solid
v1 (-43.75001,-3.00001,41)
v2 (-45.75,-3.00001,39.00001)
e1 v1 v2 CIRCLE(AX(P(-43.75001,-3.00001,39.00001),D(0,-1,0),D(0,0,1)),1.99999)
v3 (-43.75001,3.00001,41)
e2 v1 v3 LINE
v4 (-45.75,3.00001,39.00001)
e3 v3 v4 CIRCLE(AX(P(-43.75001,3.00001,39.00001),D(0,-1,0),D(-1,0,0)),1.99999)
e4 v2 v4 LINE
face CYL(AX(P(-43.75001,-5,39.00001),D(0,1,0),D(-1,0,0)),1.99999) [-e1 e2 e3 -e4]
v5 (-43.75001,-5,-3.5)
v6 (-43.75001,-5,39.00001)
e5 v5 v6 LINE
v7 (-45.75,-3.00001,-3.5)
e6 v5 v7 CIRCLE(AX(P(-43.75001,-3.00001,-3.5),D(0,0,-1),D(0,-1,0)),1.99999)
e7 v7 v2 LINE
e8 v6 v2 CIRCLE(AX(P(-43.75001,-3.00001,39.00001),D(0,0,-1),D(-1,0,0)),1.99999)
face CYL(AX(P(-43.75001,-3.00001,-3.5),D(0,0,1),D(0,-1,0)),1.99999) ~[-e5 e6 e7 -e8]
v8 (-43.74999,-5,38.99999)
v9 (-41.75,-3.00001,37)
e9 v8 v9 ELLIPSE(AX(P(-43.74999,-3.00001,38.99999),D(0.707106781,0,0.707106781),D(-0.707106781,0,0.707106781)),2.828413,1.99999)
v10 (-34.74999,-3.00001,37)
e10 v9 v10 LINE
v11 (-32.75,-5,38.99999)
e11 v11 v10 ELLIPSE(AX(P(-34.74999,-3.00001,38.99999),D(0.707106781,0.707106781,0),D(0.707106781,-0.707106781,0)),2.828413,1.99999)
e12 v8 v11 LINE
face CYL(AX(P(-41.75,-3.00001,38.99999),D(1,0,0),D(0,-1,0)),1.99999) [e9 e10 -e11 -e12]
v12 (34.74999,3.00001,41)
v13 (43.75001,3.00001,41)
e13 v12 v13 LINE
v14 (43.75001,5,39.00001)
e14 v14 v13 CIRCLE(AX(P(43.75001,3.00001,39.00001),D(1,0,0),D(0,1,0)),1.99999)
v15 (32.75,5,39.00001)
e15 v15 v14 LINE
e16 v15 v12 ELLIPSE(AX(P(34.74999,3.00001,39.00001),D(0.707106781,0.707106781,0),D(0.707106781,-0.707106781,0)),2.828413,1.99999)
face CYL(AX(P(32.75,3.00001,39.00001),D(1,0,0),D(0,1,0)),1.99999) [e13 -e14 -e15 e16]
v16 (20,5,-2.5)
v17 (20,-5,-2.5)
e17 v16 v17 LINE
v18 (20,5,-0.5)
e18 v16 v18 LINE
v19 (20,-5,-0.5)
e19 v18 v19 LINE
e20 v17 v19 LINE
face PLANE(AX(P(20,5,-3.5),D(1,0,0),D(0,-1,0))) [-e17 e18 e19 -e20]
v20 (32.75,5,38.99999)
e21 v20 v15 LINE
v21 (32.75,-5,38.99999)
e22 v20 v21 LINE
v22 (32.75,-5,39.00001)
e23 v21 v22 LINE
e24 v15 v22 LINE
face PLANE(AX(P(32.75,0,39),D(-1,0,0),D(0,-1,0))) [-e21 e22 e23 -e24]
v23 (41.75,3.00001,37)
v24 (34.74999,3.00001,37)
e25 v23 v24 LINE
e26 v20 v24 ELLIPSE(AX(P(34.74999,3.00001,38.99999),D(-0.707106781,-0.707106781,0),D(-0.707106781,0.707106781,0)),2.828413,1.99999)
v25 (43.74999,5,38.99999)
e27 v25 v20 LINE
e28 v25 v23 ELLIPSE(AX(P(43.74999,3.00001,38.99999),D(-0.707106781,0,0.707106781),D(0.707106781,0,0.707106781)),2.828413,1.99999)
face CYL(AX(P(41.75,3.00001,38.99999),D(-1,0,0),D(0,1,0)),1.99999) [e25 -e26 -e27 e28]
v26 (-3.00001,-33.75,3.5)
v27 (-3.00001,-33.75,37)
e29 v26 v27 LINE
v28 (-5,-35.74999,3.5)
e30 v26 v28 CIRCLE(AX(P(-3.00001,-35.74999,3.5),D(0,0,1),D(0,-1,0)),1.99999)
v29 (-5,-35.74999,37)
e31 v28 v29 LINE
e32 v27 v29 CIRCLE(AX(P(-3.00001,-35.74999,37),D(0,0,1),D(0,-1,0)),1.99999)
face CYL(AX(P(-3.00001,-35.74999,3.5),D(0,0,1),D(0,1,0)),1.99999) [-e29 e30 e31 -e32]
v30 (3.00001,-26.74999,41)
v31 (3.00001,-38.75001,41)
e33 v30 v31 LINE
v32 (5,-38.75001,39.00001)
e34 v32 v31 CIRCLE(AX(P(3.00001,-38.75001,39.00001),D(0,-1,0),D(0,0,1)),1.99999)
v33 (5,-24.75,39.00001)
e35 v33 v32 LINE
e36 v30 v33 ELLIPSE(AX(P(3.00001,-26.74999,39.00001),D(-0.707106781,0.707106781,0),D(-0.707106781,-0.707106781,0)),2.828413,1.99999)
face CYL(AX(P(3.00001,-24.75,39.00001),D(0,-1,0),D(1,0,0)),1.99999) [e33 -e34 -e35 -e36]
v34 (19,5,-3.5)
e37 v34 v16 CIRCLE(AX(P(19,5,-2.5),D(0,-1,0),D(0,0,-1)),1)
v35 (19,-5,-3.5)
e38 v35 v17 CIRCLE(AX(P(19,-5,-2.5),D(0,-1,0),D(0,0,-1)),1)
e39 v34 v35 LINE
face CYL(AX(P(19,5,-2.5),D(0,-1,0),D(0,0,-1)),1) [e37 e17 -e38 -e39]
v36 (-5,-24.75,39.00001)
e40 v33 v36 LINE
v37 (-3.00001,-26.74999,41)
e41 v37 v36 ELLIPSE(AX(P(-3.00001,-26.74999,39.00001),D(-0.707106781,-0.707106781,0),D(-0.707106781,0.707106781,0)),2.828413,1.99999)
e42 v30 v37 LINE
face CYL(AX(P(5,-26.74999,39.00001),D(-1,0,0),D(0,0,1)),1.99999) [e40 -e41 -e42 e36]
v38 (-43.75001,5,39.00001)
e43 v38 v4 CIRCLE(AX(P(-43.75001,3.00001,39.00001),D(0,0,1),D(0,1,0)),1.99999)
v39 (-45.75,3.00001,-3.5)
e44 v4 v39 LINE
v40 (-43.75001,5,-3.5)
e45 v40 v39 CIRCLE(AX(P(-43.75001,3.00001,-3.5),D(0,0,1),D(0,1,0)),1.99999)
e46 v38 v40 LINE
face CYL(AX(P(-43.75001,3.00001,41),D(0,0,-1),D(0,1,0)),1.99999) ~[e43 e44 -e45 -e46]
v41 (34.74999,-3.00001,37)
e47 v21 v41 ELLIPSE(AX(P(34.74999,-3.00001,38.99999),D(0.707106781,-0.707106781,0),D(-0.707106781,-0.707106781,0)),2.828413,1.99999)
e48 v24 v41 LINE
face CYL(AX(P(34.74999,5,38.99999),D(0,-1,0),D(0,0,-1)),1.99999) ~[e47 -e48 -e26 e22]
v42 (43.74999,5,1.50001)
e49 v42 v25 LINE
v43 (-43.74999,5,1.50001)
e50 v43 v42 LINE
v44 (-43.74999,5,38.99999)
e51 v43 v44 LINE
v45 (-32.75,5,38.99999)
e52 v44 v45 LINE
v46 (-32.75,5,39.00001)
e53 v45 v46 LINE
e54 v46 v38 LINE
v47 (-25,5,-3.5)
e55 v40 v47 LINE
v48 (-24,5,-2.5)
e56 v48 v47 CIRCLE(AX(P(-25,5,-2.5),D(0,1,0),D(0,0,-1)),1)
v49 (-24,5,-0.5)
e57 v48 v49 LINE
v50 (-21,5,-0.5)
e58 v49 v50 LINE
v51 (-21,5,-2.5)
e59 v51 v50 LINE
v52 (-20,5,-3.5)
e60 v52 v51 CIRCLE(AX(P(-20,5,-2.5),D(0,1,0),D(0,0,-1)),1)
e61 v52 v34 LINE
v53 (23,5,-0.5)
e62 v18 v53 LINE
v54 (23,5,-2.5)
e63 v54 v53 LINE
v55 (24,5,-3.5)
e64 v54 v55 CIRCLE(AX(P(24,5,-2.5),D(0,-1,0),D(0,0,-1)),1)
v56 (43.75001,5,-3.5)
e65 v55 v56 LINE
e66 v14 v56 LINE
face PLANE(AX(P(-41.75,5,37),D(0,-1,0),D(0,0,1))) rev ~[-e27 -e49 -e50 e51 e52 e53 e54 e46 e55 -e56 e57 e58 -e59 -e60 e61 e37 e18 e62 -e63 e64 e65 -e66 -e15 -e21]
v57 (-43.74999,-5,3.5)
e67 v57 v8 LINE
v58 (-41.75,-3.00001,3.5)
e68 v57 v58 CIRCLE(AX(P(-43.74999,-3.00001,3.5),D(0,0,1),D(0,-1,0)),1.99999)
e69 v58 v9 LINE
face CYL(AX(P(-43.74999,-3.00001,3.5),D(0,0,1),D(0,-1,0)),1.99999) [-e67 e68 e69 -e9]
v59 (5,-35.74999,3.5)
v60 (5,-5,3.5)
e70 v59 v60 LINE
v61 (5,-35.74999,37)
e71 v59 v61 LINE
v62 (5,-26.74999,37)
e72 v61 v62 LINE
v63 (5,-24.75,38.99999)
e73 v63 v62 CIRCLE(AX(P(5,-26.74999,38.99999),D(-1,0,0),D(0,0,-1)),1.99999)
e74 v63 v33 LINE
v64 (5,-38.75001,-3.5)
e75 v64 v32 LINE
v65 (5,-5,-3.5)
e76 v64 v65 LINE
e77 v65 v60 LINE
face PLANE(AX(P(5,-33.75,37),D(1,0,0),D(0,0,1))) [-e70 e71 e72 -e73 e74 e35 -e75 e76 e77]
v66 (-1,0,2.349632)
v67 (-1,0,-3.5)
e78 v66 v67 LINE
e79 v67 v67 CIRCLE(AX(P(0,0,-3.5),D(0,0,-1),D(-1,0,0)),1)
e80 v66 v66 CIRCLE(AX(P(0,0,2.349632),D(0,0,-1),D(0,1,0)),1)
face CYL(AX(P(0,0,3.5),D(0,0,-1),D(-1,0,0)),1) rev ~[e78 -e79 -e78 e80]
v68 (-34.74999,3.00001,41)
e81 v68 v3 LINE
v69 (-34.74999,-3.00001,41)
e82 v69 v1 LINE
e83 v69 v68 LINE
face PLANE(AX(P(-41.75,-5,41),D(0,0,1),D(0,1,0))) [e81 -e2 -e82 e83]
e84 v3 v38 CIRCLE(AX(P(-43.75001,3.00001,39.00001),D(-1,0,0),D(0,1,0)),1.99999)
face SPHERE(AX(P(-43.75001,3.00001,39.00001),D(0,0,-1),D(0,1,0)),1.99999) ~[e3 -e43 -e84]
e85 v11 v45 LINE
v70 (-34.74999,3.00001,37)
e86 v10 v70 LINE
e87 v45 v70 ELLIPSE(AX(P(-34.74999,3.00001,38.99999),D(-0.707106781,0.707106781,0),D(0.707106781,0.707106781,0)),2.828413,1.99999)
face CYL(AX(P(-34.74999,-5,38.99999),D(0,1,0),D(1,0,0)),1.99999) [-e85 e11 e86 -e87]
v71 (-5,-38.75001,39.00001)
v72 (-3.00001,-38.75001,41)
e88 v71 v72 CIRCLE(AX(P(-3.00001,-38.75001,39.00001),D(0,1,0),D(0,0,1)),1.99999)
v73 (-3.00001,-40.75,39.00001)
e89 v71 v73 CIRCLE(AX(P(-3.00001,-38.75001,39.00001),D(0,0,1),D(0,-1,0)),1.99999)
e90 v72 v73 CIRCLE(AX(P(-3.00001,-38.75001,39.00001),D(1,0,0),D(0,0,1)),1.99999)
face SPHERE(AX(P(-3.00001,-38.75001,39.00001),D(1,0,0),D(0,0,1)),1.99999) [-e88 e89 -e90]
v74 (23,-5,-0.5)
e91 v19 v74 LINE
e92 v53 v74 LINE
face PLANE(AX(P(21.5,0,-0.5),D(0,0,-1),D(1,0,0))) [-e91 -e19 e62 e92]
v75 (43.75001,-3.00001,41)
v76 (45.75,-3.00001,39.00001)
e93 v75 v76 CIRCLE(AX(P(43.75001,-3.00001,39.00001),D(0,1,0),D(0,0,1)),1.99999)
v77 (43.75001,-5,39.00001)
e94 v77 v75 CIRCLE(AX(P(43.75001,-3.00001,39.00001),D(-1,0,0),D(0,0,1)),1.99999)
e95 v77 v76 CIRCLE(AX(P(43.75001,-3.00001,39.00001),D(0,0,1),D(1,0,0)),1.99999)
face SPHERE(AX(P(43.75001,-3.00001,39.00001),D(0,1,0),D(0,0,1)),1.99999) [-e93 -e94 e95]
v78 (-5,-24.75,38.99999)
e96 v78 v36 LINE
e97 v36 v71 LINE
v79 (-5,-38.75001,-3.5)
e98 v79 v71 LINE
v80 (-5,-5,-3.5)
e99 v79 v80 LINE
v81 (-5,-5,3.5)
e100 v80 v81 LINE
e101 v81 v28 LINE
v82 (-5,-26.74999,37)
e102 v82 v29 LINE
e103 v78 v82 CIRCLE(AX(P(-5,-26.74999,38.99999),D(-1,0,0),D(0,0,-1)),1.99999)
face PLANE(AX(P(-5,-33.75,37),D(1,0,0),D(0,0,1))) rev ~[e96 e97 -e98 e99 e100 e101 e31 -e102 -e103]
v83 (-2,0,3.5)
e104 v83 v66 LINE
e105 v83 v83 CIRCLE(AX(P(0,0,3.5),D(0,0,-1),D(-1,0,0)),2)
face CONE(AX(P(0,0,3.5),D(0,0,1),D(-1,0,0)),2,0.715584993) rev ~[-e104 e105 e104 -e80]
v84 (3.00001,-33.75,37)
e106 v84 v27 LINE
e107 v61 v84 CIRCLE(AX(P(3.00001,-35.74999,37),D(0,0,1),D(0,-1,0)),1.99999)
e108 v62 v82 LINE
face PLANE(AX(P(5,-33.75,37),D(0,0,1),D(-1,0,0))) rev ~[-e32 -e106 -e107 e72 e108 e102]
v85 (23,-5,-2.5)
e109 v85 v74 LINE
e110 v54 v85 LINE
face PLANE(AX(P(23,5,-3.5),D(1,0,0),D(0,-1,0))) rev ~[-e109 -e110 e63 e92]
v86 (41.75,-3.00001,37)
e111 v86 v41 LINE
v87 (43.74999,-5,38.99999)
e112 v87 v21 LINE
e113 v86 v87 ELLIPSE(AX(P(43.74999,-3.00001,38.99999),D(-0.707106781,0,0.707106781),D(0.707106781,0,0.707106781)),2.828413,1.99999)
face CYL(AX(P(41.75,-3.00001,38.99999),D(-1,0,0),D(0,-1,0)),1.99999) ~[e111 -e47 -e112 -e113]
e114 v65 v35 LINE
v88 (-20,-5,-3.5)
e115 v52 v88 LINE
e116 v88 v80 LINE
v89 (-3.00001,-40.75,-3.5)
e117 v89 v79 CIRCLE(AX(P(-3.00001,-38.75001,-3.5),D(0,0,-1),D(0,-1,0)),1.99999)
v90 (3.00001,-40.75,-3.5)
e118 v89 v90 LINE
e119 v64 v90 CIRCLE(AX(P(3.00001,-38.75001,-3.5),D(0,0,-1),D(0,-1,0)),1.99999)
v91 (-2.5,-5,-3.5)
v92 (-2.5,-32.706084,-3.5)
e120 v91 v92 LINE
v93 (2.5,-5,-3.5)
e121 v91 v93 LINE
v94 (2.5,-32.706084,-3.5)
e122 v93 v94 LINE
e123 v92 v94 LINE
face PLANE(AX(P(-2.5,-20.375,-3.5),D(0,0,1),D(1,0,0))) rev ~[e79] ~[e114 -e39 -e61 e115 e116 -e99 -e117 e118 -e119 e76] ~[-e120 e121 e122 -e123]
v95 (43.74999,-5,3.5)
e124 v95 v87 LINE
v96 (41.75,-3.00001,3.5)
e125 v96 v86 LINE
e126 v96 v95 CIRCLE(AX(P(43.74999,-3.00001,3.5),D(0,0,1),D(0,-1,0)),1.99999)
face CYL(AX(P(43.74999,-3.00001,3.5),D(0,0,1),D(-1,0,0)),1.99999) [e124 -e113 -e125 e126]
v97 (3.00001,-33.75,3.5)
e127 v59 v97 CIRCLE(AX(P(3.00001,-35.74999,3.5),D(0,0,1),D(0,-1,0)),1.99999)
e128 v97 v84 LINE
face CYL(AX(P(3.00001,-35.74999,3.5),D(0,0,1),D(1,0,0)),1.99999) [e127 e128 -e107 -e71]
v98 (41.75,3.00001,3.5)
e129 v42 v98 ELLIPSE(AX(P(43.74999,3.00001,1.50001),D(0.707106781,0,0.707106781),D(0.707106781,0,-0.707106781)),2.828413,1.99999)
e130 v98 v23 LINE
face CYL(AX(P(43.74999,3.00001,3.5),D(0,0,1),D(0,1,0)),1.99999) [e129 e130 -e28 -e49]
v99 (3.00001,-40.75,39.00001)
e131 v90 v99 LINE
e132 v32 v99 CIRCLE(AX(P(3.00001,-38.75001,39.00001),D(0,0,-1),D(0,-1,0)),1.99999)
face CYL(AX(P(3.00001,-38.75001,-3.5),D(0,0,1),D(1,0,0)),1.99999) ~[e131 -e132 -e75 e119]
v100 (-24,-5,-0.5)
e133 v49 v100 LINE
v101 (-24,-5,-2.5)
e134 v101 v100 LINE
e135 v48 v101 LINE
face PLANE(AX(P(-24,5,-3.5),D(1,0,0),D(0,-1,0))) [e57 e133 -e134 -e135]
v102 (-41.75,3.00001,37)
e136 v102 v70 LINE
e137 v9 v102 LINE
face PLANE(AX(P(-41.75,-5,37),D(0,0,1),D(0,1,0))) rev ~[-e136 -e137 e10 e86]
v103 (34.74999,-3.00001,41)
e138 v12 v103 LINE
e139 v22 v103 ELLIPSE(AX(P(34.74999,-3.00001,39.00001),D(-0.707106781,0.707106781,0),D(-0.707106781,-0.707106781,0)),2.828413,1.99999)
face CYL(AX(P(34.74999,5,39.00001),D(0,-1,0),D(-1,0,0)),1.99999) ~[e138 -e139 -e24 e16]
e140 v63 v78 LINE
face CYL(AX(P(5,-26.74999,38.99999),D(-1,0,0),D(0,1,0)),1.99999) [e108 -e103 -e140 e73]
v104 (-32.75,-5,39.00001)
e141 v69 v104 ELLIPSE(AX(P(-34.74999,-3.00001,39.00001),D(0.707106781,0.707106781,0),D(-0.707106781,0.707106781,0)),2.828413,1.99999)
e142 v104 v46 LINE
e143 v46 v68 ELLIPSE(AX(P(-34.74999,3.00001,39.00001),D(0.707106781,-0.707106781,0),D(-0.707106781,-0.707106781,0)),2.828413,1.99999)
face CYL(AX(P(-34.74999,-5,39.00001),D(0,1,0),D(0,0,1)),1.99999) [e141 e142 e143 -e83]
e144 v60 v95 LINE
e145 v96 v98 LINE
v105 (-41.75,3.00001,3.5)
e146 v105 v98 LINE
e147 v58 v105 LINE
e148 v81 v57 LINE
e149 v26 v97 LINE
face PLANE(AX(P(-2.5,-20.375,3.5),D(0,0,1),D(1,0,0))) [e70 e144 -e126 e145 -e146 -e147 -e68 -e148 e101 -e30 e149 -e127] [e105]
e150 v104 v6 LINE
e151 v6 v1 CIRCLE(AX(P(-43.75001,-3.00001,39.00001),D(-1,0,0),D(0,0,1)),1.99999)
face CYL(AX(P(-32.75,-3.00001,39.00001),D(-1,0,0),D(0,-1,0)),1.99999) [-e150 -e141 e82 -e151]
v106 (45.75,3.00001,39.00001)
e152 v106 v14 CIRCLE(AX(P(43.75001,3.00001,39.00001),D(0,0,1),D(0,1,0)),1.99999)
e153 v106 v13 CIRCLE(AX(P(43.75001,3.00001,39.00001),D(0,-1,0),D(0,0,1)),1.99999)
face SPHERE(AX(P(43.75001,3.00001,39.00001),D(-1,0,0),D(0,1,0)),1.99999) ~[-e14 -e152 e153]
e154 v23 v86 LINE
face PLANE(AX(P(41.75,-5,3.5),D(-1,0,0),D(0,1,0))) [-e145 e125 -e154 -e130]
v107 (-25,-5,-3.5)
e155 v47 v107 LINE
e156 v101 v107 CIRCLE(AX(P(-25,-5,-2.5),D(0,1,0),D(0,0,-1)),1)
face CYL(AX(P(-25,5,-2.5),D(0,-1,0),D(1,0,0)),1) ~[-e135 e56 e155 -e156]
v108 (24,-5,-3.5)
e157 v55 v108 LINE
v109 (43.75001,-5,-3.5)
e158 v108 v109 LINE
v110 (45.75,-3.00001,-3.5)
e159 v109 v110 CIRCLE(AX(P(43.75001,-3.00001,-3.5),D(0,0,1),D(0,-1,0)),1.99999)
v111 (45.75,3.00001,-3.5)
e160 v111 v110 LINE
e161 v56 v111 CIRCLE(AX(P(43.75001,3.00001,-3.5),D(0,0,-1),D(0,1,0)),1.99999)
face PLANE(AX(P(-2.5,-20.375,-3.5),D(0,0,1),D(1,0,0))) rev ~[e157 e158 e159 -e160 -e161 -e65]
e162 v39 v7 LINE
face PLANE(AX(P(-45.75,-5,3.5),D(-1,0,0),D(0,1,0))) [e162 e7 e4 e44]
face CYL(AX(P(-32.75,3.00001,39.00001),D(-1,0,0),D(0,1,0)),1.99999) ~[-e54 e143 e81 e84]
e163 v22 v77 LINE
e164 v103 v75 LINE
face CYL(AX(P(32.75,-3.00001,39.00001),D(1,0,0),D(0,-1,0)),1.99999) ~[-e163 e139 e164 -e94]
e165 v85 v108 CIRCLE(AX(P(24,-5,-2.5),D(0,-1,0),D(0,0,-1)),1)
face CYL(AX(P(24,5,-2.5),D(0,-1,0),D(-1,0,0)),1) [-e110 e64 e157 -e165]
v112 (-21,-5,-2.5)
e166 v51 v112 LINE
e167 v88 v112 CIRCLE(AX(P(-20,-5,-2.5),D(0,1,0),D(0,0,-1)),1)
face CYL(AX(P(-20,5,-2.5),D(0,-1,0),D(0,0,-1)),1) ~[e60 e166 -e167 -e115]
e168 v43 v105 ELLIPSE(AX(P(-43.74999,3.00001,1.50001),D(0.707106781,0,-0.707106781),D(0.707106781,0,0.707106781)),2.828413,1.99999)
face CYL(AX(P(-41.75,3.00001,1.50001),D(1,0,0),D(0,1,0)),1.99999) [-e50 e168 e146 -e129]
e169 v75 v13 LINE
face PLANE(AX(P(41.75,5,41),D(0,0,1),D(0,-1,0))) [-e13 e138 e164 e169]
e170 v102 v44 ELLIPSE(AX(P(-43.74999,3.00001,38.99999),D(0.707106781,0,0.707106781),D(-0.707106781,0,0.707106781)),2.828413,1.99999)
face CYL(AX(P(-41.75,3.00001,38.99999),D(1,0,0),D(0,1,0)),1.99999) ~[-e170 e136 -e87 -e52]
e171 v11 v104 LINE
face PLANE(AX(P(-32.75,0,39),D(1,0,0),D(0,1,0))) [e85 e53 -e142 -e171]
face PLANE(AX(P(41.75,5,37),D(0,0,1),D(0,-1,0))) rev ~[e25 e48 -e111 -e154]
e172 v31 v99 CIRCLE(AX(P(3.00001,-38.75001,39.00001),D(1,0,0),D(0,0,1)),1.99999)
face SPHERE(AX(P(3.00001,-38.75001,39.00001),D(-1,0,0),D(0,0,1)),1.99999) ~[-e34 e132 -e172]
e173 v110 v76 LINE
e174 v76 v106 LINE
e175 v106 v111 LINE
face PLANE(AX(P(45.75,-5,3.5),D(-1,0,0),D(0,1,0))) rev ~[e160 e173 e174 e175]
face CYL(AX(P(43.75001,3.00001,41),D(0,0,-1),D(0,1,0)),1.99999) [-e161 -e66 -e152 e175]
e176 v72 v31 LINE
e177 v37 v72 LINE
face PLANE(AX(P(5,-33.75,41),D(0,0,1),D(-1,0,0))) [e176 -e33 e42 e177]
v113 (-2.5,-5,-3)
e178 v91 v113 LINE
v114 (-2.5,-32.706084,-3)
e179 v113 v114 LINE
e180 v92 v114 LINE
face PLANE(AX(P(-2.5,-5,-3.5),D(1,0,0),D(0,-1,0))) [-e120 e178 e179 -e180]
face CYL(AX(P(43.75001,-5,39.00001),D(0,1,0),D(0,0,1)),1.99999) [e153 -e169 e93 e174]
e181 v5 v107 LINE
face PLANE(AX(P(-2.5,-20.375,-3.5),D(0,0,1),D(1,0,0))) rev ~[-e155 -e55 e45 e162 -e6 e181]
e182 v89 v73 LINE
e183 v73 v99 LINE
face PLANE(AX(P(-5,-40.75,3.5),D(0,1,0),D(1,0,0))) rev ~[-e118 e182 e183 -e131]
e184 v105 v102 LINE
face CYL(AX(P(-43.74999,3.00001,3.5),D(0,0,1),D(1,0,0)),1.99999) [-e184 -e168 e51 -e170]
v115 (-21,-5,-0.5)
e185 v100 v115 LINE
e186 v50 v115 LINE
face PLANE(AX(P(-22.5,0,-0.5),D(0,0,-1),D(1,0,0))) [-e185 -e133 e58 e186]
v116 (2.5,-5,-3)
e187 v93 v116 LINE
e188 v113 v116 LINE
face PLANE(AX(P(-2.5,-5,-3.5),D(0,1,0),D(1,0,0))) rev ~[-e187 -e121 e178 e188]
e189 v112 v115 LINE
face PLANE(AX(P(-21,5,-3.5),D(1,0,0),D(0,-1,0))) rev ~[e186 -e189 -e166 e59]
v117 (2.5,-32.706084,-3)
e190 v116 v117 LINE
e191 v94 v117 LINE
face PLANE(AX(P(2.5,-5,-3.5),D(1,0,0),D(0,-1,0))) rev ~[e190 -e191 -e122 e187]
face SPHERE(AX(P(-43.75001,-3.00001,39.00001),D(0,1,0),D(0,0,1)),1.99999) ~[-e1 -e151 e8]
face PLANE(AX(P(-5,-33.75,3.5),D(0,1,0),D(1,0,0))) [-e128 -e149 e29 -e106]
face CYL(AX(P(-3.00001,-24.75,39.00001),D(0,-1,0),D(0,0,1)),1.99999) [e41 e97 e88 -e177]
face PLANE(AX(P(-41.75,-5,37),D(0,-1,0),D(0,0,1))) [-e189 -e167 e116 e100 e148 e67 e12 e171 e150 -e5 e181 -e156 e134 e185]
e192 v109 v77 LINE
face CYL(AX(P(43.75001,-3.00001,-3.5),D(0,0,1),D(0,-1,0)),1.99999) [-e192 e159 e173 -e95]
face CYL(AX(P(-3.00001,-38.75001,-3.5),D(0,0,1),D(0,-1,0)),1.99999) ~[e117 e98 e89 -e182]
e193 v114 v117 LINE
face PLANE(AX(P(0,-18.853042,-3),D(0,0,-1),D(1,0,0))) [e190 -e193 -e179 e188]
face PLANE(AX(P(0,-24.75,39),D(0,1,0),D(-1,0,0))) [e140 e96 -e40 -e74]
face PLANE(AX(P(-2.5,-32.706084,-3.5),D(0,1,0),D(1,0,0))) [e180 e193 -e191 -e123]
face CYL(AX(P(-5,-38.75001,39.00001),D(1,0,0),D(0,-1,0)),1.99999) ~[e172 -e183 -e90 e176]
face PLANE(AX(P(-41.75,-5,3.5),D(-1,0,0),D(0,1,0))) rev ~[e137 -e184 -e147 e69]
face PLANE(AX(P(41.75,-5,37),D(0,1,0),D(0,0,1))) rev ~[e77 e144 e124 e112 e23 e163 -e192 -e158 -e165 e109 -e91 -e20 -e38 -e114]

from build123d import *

# Parameters (mm, degrees)
F0_W            = 91.5
F0_H            = 7
F1_DEPTH        = 5
F2_W            = 5
F2_H            = 40.75
F3_DEPTH        = 3.5
F4_W            = 4
F4_H            = 10
F5_DEPTH        = 37.5
F6_W            = 4
F6_H            = 10
F7_DEPTH        = 37.5
F8_W            = 10
F8_H            = 7
F9_DEPTH        = 37.5
F10_W           = 10
F10_H           = 4
F11_DEPTH       = 9
F12_W           = 10
F12_H           = 4
F13_DEPTH       = 9
F14_W           = 10
F14_H           = 4
F15_DEPTH       = 9
F16_R           = 1.99999
F18_D           = 2
F18_DEPTH       = 18
F18_CSINK_D     = 4
F18_CSINK_ANGLE = 82
F18_TIP         = 0.600860619
F19_W           = 3
F19_H           = 10
F20_DEPTH       = 3
F21_R           = 1
F22_W           = 5
F22_H           = 27.7060836997
F23_DEPTH       = 0.5


# Not quite as in the source:
# - a fillet or chamfer is up to 0.001 mm smaller than in the source, because OpenCascade refuses the exact size


with BuildPart() as f1:
    # F0 (on Front) → F1 (new body, symmetric)
    with BuildSketch(Plane.XZ):
        Rectangle(F0_W, F0_H)
    extrude(amount=F1_DEPTH, both=True)

    # F2 (on Top) → F3 (join, symmetric)
    with BuildSketch(Plane.XY):
        with Locations((-2.5, -20.375)):
            Rectangle(F2_W, F2_H)
        with Locations((2.5, -20.375)):
            Rectangle(F2_W, F2_H)
    extrude(amount=F3_DEPTH, both=True)

    # F4 (on face) → F5 (join)
    with BuildSketch(Plane.XY.offset(3.5)):
        with Locations((-43.75, 0)):
            Rectangle(F4_W, F4_H)
    extrude(amount=F5_DEPTH)

    # F6 (on face) → F7 (join)
    with BuildSketch(Plane.XY.offset(3.5)):
        with Locations((43.75, 0)):
            Rectangle(F6_W, F6_H)
    extrude(amount=F7_DEPTH)

    # F8 (on face) → F9 (join)
    with BuildSketch(Plane.XY.offset(3.5)):
        with Locations((0, -37.25)):
            Rectangle(F8_W, F8_H)
    extrude(amount=F9_DEPTH)

    # F10 (on face) → F11 (join)
    with BuildSketch(Plane(origin=(0, -33.75, 0), x_dir=(-1, 0, 0), z_dir=(0, 1, 0))):
        with Locations((0, 39)):
            Rectangle(F10_W, F10_H)
    extrude(amount=F11_DEPTH)

    # F12 (on face) → F13 (join)
    with BuildSketch(Plane(origin=(41.75, 0, 0), x_dir=(0, -1, 0), z_dir=(-1, 0, 0))):
        with Locations((0, 39)):
            Rectangle(F12_W, F12_H)
    extrude(amount=F13_DEPTH)

    # F14 (on face) → F15 (join)
    with BuildSketch(Plane.YZ.offset(-41.75)):
        with Locations((0, 39)):
            Rectangle(F14_W, F14_H)
    extrude(amount=F15_DEPTH)

    # F16 (radius 2 in the source; OpenCascade refuses exactly that, so slightly less here)
    f16_edges = [f1.edges().sort_by_distance(p)[0] for p in [
        (0, 5, 3.5),
        (41.75, 5, 20.25),
        (37.25, 5, 37),
        (-41.75, 5, 20.25),
        (-37.25, 5, 37),
        (32.75, 0, 41),
        (39.25, 5, 41),
        (45.75, 5, 18.75),
        (-45.75, 5, 18.75),
        (-39.25, 5, 41),
        (-32.75, 0, 41),
        (0, -24.75, 41),
        (-5, -33.75, 20.25),
        (5, -33.75, 20.25),
        (-41.75, -5, 20.25),
        (41.75, -5, 20.25),
        (-37.25, -5, 37),
        (37.25, -5, 37),
        (-45.75, 0, 41),
        (45.75, 0, 41),
        (0, -40.75, 41),
        (5, -32.75, 41),
        (-5, -32.75, 41),
        (0, -24.75, 37),
        (-5, -40.75, 18.75),
        (5, -40.75, 18.75),
        (39.25, -5, 41),
        (-39.25, -5, 41),
        (-45.75, -5, 18.75),
        (45.75, -5, 18.75),
        (-32.75, 0, 37),
        (32.75, 0, 37),
    ]]
    fillet(f16_edges, radius=F16_R)

    # F18
    with Locations(Plane.XY.offset(3.5)):
        with Locations((0, 0)):
            CounterSinkHole(F18_D / 2, F18_CSINK_D / 2, depth=F18_DEPTH, counter_sink_angle=F18_CSINK_ANGLE)
            with Locations((0, 0, -(F18_DEPTH + F18_TIP / 2))):  # 118° drill point
                Cone(0, F18_D / 2, F18_TIP, mode=Mode.SUBTRACT)

    # F19 (on face) → F20 (cut)
    with BuildSketch(Plane(origin=(0, 0, -3.5), x_dir=(1, 0, 0), z_dir=(0, 0, -1))):
        with Locations((21.5, 0)):
            Rectangle(F19_W, F19_H)
        with Locations((-22.5, 0)):
            Rectangle(F19_W, F19_H)
    extrude(amount=-F20_DEPTH, mode=Mode.SUBTRACT)

    # F21
    f21_edges = [f1.edges().sort_by_distance(p)[0] for p in [
        (20, 0, -3.5),
        (23, 0, -3.5),
        (-21, 0, -3.5),
        (-24, 0, -3.5),
    ]]
    fillet(f21_edges, radius=F21_R)

    # F22 (on face) → F23 (cut)
    with BuildSketch(Plane(origin=(0, 0, -3.5), x_dir=(1, 0, 0), z_dir=(0, 0, -1))):
        with Locations((0, 18.8530418498)):
            Rectangle(F22_W, F22_H)
    extrude(amount=-F23_DEPTH, mode=Mode.SUBTRACT)


solid = f1.part
